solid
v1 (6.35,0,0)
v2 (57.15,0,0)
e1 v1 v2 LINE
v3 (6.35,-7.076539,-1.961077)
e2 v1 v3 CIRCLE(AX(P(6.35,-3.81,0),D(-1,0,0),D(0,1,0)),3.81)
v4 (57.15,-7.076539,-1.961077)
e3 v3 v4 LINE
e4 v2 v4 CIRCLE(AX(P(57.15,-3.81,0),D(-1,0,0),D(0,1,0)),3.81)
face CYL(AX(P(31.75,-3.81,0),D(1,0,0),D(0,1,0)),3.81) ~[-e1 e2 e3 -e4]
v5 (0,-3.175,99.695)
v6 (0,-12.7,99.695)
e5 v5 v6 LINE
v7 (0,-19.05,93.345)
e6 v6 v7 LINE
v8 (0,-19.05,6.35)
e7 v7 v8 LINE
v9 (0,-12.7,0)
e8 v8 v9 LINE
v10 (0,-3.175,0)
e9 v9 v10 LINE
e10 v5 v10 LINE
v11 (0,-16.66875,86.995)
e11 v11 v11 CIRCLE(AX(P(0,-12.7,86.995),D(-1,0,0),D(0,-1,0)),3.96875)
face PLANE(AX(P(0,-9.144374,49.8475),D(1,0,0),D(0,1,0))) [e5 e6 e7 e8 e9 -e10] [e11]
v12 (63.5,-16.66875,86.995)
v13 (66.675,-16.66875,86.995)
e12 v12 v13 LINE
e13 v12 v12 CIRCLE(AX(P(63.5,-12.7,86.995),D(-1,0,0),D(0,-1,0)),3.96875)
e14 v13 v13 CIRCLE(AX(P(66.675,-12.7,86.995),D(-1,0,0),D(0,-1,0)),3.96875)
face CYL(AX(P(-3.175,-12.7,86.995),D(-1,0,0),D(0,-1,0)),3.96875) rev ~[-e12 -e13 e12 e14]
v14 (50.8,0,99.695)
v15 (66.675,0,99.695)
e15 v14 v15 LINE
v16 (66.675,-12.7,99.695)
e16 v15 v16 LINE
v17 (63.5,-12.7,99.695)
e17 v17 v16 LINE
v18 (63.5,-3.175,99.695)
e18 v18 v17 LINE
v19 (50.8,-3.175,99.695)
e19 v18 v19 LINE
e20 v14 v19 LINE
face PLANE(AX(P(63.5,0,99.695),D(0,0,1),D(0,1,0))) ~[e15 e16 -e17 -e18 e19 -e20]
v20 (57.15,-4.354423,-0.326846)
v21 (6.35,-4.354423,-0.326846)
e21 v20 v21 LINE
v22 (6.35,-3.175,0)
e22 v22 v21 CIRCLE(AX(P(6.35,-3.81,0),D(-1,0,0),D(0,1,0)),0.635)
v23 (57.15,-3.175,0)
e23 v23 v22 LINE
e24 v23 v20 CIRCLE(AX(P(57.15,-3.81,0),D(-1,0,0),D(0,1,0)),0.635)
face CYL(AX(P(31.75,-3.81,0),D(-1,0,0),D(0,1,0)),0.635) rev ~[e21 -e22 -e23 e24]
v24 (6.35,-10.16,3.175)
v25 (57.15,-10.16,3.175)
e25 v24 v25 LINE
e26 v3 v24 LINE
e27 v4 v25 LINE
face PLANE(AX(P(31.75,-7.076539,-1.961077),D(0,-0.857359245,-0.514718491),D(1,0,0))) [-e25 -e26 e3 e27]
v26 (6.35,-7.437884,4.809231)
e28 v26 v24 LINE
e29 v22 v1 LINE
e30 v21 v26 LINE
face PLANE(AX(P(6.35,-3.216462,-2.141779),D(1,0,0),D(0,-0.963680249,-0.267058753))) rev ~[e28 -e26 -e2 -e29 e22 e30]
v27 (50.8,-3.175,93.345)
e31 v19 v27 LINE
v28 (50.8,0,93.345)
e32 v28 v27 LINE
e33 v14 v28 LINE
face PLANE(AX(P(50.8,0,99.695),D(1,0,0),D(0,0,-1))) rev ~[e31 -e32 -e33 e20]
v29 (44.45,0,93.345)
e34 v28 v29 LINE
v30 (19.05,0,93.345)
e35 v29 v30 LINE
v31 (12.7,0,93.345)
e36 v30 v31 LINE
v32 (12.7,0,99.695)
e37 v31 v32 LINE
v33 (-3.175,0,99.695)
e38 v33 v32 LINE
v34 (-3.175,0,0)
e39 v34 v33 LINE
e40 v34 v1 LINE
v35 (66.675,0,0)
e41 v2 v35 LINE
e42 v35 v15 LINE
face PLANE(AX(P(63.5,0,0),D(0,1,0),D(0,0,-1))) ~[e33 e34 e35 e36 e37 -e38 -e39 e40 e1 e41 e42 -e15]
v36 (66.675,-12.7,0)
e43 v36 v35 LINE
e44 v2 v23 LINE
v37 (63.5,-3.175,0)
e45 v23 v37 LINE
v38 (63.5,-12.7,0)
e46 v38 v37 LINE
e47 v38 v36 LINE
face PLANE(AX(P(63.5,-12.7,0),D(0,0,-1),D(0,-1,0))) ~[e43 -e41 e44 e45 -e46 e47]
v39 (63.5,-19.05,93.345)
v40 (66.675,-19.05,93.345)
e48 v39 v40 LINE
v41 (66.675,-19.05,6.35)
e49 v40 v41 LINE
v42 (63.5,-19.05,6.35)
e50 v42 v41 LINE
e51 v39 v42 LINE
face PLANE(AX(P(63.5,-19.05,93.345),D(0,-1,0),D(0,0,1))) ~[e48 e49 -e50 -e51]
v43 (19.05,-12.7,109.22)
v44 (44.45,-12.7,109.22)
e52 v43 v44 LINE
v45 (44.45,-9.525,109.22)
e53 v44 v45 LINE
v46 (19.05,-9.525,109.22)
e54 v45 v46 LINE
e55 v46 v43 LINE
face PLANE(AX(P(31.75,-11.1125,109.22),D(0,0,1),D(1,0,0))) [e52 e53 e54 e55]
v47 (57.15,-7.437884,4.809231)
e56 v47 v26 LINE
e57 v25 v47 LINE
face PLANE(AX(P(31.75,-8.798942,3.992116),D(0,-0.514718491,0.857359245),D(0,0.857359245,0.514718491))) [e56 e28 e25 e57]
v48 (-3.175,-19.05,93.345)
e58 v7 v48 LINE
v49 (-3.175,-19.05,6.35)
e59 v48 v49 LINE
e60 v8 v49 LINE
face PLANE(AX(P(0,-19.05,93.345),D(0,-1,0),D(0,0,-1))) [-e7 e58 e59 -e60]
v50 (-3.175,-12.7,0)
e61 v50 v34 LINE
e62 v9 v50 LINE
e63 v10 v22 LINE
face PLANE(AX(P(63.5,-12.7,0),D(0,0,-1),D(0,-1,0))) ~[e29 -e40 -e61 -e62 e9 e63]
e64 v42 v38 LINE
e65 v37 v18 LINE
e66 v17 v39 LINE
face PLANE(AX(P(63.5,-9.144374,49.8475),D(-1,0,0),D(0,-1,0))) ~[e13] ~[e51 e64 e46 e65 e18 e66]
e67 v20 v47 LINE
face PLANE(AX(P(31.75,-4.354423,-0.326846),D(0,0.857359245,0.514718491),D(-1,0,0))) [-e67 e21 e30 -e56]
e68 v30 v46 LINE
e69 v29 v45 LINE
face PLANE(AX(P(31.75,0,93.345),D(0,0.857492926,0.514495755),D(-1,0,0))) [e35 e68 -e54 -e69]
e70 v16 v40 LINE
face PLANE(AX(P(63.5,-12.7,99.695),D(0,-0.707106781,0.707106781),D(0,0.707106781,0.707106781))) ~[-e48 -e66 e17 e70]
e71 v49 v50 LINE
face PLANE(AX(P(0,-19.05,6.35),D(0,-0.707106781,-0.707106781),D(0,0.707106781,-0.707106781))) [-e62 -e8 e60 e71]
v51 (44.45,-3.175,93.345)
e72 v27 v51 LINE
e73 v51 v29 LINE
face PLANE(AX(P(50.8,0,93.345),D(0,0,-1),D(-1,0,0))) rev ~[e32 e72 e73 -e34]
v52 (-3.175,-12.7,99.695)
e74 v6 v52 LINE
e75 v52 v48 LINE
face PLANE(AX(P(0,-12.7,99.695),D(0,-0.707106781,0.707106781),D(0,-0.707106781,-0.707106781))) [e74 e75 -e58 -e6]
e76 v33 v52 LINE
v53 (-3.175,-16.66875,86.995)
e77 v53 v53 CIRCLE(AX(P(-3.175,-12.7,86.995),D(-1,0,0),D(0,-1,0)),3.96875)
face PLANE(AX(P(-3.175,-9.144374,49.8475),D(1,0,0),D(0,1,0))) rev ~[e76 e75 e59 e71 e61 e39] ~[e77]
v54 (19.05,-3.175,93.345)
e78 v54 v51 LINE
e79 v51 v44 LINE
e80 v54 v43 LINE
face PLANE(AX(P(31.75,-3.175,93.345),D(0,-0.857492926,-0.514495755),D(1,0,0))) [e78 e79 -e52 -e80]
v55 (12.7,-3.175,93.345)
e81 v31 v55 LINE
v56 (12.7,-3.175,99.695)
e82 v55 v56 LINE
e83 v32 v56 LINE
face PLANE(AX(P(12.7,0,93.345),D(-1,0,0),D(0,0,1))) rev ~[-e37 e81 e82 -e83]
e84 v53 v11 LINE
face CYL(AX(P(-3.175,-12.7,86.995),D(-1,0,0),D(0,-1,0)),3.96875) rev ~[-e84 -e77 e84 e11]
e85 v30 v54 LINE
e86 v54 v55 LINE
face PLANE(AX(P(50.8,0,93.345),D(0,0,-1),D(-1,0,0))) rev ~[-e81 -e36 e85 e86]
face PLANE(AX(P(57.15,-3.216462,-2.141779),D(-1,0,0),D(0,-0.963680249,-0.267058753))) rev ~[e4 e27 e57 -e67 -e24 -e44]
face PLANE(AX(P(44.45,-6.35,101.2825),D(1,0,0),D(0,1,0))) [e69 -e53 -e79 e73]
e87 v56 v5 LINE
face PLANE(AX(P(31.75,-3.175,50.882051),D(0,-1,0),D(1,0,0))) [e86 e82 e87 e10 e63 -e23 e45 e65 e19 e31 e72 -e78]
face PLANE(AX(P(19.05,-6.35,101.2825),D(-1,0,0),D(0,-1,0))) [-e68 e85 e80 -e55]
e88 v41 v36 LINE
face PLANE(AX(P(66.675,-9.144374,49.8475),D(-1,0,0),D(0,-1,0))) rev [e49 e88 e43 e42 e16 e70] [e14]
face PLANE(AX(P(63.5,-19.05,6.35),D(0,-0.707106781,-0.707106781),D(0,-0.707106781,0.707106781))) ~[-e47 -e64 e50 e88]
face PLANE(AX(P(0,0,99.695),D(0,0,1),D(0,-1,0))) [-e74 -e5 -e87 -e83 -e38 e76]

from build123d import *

# Parameters (mm, degrees)
F1_DEPTH  = 3.175
F3_DEPTH  = 3.175
F6_W      = 50.8
F6_H      = 3.175
F9_W      = 25.4
F9_H      = 3.175
F12_R     = 3.96875
F13_DEPTH = 69.851


# Not quite as in the source:
# - a feature of the source that left no trace in its solid (it failed there, or was rolled back) is left out
# - a pattern or mirror of a feature is missing from the dataset's text; its kind, count and spacing are read off the source's solid


with BuildPart() as f1:
    # F0 (on Front) → F1 (new body)
    with BuildSketch(Plane.XZ):
        Polygon((0, 99.695), (0, 0), (63.5, 0), (63.5, 99.695), (50.8, 99.695), (50.8, 93.345), (12.7, 93.345), (12.7, 99.695), align=None)
    extrude(amount=F1_DEPTH)

    # F2 (on Right) → F3 (join)
    with BuildSketch(Plane.YZ):
        Polygon((-12.7, 0), (0, 0), (0, 99.695), (-12.7, 99.695), (-19.05, 93.345), (-19.05, 6.35), align=None)
    f3 = extrude(amount=-F3_DEPTH)

    # F3_copies: F3 across plane
    add(f3.mirror(Plane(origin=(31.75, 0, 0), x_dir=(0, 0, 1), z_dir=(1, 0, 0))))

    # F8: sweep along a path in F7
    with BuildLine(Plane.YZ) as f8_path:
        ThreePointArc((0, 0), (-2.7925061525, -3.6716217493), (-7.0765387245, -1.9610774491))
        Line((-7.0765387245, -1.9610774491), (-10.16, 3.175))
    # F6 (on face) → F8 (sweep)
    with BuildSketch(Plane(origin=(0, 0, 0), x_dir=(1, 0, 0), z_dir=(0, 0, -1))):
        with Locations((31.75, 1.5875)):
            Rectangle(F6_W, F6_H)
    sweep(path=f8_path.line)

    # F11: sweep along a path in F10
    with BuildLine(Plane.YZ) as f11_path:
        Line((-3.175, 93.345), (-12.7, 109.22))
    # F9 (on face) → F11 (sweep)
    with BuildSketch(Plane.XY.offset(93.345)):
        with Locations((31.75, -1.5875)):
            Rectangle(F9_W, F9_H)
    sweep(path=f11_path.line)

    # F12 (on face) → F13 (cut, through all)
    with BuildSketch(Plane(origin=(-3.175, 0, 0), x_dir=(0, -1, 0), z_dir=(-1, 0, 0))):
        with Locations((12.7, 86.995)):
            Circle(F12_R)
    extrude(amount=-F13_DEPTH, mode=Mode.SUBTRACT)


solid = f1.part
